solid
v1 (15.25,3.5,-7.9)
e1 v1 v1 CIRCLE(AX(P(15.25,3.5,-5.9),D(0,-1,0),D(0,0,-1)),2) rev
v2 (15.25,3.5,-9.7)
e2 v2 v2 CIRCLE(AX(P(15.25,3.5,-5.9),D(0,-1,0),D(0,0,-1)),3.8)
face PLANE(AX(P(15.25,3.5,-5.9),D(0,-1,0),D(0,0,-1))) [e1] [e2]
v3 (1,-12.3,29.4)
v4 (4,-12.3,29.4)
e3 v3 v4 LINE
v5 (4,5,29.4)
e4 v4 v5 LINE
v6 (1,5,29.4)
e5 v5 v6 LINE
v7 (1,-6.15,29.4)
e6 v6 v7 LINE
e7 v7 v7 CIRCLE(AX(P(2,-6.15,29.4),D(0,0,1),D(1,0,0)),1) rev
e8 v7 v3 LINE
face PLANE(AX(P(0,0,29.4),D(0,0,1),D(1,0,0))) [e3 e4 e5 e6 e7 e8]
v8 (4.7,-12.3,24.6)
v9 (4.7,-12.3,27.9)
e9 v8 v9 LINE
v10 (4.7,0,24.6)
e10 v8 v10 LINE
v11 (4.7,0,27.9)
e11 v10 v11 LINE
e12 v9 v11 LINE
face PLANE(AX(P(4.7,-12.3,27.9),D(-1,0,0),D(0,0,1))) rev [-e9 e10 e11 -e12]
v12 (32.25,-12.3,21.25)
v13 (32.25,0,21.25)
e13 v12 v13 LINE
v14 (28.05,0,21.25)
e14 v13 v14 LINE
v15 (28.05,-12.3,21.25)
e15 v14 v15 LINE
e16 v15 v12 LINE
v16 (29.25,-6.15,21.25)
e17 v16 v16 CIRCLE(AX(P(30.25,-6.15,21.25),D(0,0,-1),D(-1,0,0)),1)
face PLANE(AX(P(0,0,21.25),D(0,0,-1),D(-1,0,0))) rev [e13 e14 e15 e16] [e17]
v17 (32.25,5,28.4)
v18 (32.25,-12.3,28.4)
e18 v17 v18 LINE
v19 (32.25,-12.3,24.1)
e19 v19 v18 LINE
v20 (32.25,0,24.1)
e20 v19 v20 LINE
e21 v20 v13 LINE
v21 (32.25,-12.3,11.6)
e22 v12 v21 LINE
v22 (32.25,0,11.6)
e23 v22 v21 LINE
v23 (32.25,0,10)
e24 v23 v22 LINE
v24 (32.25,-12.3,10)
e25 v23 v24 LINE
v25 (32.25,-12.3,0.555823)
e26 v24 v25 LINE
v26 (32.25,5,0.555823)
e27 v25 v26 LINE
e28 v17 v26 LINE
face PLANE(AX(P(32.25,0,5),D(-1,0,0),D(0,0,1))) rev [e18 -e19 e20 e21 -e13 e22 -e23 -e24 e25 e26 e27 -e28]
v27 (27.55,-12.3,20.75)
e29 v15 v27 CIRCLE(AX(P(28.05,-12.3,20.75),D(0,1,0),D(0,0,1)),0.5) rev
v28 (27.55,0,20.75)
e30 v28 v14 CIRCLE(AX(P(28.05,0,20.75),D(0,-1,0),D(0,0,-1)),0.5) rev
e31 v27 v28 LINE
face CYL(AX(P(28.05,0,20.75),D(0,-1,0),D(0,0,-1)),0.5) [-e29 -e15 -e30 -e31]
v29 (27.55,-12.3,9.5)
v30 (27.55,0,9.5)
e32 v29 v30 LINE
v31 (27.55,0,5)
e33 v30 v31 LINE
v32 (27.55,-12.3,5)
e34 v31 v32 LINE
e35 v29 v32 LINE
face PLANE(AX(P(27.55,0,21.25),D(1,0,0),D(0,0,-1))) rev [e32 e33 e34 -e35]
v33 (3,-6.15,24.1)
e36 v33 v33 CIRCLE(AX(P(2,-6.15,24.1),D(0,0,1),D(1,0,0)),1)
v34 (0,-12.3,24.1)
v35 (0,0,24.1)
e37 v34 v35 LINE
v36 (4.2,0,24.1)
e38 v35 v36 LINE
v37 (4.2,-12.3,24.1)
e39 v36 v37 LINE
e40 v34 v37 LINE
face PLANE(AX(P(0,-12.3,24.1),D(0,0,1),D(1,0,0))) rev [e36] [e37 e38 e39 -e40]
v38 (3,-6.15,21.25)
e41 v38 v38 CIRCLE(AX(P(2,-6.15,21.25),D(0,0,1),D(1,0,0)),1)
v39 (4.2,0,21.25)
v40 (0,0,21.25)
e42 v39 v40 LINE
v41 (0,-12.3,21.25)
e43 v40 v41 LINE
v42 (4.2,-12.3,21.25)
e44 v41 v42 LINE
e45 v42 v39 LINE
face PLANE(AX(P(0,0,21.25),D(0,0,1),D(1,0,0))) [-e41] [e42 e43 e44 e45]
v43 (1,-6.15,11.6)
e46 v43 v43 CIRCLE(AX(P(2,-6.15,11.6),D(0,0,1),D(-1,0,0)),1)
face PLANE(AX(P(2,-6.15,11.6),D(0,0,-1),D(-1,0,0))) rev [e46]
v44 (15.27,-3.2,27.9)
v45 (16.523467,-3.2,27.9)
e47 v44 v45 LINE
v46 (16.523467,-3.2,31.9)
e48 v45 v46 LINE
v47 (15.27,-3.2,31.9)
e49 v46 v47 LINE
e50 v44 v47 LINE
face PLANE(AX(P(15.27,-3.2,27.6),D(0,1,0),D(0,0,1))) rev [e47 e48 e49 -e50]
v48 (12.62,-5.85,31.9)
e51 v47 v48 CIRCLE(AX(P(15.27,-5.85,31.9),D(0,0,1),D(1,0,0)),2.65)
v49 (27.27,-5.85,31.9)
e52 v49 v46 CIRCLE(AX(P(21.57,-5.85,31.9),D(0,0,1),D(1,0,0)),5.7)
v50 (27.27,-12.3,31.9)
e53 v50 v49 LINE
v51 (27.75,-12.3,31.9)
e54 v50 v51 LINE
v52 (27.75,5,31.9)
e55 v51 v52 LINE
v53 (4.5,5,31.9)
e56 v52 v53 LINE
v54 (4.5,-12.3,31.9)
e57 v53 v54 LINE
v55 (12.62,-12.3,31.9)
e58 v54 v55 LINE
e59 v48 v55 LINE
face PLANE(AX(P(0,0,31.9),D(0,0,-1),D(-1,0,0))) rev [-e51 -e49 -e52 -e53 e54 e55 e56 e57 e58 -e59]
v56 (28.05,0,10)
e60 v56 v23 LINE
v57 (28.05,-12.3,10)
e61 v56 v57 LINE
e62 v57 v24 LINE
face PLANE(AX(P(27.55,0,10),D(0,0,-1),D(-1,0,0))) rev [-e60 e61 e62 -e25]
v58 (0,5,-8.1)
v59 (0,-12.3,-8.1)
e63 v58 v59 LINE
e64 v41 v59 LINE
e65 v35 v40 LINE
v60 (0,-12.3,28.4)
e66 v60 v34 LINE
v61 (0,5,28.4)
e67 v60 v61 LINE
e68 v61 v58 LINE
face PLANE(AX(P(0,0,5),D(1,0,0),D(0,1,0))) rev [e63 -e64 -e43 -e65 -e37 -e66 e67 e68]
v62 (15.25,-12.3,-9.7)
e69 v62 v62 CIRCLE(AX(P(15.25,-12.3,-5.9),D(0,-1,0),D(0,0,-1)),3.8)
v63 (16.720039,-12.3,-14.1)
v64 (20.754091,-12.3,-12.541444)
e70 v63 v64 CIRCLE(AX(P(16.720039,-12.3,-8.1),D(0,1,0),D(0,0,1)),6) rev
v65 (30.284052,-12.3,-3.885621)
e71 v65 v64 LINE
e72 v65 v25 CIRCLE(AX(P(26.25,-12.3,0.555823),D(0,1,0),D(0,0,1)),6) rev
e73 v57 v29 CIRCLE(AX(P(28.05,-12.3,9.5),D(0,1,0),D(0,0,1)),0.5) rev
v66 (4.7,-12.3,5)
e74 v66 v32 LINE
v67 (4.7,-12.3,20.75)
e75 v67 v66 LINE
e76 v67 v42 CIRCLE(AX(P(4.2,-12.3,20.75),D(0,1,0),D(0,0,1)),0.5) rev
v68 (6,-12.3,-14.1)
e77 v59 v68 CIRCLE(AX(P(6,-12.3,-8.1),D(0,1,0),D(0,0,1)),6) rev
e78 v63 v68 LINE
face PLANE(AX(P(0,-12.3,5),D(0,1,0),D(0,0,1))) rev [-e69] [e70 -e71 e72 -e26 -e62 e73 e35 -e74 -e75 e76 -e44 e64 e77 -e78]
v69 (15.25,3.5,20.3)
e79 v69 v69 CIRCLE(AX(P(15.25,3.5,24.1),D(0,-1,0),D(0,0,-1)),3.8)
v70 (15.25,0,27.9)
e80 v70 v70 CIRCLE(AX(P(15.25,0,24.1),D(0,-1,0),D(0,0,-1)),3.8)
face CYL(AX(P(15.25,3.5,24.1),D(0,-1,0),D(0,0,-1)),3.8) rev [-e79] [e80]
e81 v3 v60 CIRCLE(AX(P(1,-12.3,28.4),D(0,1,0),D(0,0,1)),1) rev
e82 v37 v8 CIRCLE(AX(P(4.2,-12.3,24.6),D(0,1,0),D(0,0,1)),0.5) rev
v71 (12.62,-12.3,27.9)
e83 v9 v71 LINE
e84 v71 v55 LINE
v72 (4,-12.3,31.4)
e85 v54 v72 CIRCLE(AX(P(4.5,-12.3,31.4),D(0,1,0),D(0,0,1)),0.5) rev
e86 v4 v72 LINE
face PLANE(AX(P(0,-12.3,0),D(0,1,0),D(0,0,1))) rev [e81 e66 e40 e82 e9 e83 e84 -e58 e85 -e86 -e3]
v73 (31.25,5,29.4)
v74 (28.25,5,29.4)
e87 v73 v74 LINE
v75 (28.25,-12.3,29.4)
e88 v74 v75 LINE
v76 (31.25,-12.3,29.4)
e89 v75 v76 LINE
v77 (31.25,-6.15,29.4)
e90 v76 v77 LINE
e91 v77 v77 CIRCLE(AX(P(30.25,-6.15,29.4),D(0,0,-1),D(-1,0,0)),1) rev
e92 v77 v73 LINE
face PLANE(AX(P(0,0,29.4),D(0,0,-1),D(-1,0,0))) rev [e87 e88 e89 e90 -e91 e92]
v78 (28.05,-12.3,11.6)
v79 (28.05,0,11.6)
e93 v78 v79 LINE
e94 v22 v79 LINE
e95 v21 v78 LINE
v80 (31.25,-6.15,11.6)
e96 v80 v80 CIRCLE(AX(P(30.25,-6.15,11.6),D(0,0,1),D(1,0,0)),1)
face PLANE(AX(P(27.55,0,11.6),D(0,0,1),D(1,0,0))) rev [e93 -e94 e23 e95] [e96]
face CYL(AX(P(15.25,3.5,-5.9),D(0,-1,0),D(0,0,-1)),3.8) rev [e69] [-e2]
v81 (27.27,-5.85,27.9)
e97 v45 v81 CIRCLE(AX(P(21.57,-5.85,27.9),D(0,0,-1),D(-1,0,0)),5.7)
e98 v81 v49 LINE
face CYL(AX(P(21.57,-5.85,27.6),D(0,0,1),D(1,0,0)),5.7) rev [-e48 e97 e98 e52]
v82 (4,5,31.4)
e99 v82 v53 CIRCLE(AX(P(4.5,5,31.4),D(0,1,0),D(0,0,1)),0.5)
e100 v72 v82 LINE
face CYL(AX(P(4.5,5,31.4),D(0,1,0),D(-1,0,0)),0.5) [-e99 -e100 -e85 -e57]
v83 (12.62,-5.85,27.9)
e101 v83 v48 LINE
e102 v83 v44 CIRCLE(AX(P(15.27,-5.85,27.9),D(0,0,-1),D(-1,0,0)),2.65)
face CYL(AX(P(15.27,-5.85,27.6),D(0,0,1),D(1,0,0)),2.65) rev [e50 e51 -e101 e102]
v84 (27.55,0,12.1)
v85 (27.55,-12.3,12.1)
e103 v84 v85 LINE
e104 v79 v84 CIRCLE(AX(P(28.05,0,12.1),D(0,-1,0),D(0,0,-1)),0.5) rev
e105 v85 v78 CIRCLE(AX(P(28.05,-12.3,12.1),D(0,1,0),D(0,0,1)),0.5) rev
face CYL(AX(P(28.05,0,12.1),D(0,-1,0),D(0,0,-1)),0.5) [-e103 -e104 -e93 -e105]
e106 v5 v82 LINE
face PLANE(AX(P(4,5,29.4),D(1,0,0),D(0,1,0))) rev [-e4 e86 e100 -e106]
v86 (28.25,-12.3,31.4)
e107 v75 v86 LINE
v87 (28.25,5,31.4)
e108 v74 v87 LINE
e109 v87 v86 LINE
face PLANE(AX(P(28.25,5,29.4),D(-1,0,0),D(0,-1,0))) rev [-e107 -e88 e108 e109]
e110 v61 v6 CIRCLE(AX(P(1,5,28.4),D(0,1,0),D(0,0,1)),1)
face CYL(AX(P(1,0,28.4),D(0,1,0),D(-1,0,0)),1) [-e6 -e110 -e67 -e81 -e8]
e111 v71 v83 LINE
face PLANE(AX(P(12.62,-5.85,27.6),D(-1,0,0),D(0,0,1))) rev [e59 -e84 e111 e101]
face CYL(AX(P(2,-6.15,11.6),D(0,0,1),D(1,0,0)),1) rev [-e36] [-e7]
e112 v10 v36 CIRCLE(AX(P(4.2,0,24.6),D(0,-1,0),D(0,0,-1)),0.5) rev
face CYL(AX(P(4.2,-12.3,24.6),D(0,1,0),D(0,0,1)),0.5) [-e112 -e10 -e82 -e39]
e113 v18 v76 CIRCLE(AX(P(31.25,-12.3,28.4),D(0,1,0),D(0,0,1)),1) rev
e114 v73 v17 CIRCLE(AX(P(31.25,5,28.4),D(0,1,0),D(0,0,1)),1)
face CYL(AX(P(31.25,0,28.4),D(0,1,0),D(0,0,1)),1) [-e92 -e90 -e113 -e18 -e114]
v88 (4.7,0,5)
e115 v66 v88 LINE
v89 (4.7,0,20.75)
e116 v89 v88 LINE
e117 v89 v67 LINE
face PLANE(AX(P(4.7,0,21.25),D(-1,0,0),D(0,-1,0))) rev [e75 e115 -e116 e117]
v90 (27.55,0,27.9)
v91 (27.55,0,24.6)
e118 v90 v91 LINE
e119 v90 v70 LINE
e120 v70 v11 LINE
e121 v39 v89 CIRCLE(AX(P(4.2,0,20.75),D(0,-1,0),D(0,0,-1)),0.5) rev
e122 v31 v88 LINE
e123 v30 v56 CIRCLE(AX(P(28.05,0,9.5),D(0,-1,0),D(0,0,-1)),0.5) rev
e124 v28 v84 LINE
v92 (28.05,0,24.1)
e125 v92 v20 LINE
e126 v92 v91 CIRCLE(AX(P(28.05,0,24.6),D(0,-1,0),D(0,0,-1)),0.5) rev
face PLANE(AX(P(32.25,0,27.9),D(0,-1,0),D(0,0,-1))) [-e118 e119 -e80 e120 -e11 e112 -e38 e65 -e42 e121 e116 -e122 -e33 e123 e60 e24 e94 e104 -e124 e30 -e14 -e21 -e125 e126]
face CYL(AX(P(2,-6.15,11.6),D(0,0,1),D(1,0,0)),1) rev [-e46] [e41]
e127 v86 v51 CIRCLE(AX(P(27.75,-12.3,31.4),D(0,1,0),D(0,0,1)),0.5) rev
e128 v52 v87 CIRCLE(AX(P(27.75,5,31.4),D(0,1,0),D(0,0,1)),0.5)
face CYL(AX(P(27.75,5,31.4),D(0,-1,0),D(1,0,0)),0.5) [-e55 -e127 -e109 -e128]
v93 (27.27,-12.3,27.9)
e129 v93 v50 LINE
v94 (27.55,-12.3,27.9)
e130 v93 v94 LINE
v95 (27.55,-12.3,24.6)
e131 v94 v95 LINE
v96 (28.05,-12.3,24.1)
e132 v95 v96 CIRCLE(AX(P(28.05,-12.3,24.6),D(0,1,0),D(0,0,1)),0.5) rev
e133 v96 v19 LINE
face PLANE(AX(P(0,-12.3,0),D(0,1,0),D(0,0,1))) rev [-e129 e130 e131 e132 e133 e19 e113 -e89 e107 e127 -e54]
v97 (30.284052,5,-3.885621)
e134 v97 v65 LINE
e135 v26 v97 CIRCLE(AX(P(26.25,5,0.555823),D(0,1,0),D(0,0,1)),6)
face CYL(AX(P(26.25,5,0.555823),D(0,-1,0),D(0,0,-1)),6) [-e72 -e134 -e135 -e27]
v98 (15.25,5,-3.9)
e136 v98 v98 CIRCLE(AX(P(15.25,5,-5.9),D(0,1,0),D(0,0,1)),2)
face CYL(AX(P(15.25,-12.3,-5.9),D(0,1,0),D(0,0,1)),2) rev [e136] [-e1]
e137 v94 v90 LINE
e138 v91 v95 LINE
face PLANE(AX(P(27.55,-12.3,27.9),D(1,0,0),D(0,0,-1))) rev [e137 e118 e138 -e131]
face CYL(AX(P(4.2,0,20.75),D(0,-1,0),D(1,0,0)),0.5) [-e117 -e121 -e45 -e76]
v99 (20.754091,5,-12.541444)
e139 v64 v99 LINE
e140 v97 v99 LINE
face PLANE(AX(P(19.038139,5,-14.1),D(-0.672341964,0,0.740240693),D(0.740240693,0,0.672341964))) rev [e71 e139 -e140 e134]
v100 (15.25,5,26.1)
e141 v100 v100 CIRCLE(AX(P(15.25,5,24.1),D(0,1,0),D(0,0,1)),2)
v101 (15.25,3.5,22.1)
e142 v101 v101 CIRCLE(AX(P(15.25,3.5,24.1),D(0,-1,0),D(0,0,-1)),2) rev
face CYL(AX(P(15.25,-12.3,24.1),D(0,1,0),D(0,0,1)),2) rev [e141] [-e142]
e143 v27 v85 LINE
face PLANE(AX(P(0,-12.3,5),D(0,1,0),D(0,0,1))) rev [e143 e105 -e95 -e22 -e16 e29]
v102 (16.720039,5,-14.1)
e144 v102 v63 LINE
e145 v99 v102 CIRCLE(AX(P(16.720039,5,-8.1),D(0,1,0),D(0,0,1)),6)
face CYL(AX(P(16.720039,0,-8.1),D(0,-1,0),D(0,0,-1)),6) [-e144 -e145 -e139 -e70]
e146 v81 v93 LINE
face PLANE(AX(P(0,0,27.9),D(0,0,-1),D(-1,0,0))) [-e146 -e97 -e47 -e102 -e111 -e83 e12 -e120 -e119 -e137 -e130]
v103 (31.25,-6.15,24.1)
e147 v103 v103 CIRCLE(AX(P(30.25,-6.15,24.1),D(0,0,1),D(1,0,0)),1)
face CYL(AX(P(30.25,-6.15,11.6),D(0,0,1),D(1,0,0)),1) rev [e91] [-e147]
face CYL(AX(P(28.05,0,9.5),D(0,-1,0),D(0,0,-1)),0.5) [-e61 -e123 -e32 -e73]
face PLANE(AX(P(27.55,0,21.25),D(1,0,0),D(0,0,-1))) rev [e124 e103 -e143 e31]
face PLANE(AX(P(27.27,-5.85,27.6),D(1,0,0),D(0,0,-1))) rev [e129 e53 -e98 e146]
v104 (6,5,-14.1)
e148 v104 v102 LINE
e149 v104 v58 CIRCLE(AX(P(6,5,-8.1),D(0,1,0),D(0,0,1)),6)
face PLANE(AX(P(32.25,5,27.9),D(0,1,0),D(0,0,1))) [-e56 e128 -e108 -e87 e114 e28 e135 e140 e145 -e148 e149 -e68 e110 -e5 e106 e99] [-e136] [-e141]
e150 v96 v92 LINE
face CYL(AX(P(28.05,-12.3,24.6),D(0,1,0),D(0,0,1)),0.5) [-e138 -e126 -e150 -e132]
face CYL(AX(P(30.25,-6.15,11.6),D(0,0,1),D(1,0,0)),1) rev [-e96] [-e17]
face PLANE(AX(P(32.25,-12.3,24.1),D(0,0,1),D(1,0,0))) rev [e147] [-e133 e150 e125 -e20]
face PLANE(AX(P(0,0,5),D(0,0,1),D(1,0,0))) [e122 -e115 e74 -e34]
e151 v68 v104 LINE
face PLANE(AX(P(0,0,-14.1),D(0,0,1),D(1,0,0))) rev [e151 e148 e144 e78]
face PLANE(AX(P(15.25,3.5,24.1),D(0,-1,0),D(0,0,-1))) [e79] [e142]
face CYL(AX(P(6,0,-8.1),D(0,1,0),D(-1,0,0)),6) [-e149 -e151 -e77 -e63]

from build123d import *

# Parameters (mm, degrees)
ESQUISSE1_W              = 32.25
ESQUISSE1_H              = 12.3
BOSS_EXTRU_1_DEPTH       = 5
ESQUISSE2_W              = 4.7
ESQUISSE2_H              = 12.3
BOSS_EXTRU_2_DEPTH       = 16.25
ESQUISSE5_W              = 32.25
ESQUISSE5_H              = 5
BOSS_EXTRU_4_DEPTH       = 27.9
ESQUISSE6_W              = 4.7
ESQUISSE6_H              = 3.8
BOSS_EXTRU_5_DEPTH       = 12.3
ESQUISSE7_W              = 32.25
ESQUISSE7_H              = 17.3
BOSS_EXTRU_6_DEPTH       = 4
ENL_V_MAT_EXTRU_2_DEPTH  = 4.3
ENL_V_START              = -12.3
ESQUISSE9_W              = 4.7
ESQUISSE9_H              = 1.6
ENL_V_MAT_EXTRU_3_DEPTH  = 12.3
ESQUISSE10_R             = 1
ENL_V_MAT_EXTRU_4_DEPTH  = 20.3
ESQUISSE16_W             = 32.25
ESQUISSE16_H             = 17.3
BOSS_EXTRU_8_DEPTH       = 14.1
ENL_V_START_2            = -17.3
ESQUISSE18_R             = 2
ENL_V_MAT_EXTRU_8_DEPTH  = 17.3
CONG_4_R                 = 6
ESQUISSE19_R             = 3.8
ENL_V_MAT_EXTRU_9_DEPTH  = 15.8
ESQUISSE20_W             = 4
ESQUISSE20_H             = 17.3
ENL_V_MAT_EXTRU_10_DEPTH = 2.5
ENL_V_MAT_EXTRU_11_DEPTH = 17.3
CONG_5_R                 = 6
CONG_6_R                 = 6
CONG_7_R                 = 1
CONG_8_R                 = 1
CONG_9_R                 = 0.5
CONG_10_R                = 0.5
CONG_11_R                = 0.5


with BuildPart() as part:
    # Esquisse1 → Boss.-Extru.1 (new body)
    with BuildSketch(Plane.XY):
        with Locations((16.125, -6.15)):
            Rectangle(ESQUISSE1_W, ESQUISSE1_H)
    extrude(amount=BOSS_EXTRU_1_DEPTH)

    # Esquisse2 → Boss.-Extru.2 (add)
    with BuildSketch(Plane.XY.offset(5)):
        with Locations((2.35, -6.15)):
            Rectangle(ESQUISSE2_W, ESQUISSE2_H)
        with Locations((29.9, -6.15)):
            Rectangle(ESQUISSE2_W, ESQUISSE2_H)
    extrude(amount=BOSS_EXTRU_2_DEPTH)

    # Esquisse5 → Boss.-Extru.4 (add)
    with BuildSketch(Plane(origin=(0, 0, 0), x_dir=(-1, 0, 0), z_dir=(0, 0, -1))):
        with Locations((-16.125, 2.5)):
            Rectangle(ESQUISSE5_W, ESQUISSE5_H)
    extrude(amount=-BOSS_EXTRU_4_DEPTH)

    # Esquisse6 → Boss.-Extru.5 (add)
    with BuildSketch(Plane.XZ):
        with Locations((29.9, 26)):
            Rectangle(ESQUISSE6_W, ESQUISSE6_H)
        with Locations((2.35, 26)):
            Rectangle(ESQUISSE6_W, ESQUISSE6_H)
    extrude(amount=BOSS_EXTRU_5_DEPTH)

    # Esquisse7 → Boss.-Extru.6 (add)
    with BuildSketch(Plane.XY.offset(27.9)):
        with Locations((16.125, -3.65)):
            Rectangle(ESQUISSE7_W, ESQUISSE7_H)
    extrude(amount=BOSS_EXTRU_6_DEPTH)

    # Esquisse8 → Enlèv. mat.-Extru.2 (cut)
    with BuildSketch(Plane.XY.offset(31.9)):
        with BuildLine():
            Line((12.62, -5.85), (12.62, -12.3))
            Line((12.62, -12.3), (27.27, -12.3))
            Line((27.27, -12.3), (27.27, -5.85))
            ThreePointArc((27.27, -5.85), (22.934690305, -0.315777347), (16.523466536, -3.2))
            Line((16.523466536, -3.2), (15.27, -3.2))
            ThreePointArc((15.27, -3.2), (13.39616703, -3.97616703), (12.62, -5.85))
        make_face()
    extrude(amount=-ENL_V_MAT_EXTRU_2_DEPTH, mode=Mode.SUBTRACT)

    # Esquisse9 → Enlèv. mat.-Extru.3 (cut)
    with BuildSketch(Plane.XZ.offset(12.3).offset(ENL_V_START)):
        with Locations((29.9, 10.8)):
            Rectangle(ESQUISSE9_W, ESQUISSE9_H)
    extrude(amount=ENL_V_MAT_EXTRU_3_DEPTH, mode=Mode.SUBTRACT)

    # Esquisse10 → Enlèv. mat.-Extru.4 (cut)
    with BuildSketch(Plane.XY.offset(31.9)):
        with Locations((30.25, -6.15)):
            Circle(ESQUISSE10_R)
        with Locations((2, -6.15)):
            Circle(ESQUISSE10_R)
    extrude(amount=-ENL_V_MAT_EXTRU_4_DEPTH, mode=Mode.SUBTRACT)

    # Esquisse16 → Boss.-Extru.8 (add)
    with BuildSketch(Plane(origin=(0, 0, 0), x_dir=(-1, 0, 0), z_dir=(0, 0, -1))):
        with Locations((-16.125, -3.65)):
            Rectangle(ESQUISSE16_W, ESQUISSE16_H)
    extrude(amount=BOSS_EXTRU_8_DEPTH)

    # Esquisse18 → Enlèv. mat.-Extru.8 (cut)
    with BuildSketch(Plane(origin=(0, 5, 0), x_dir=(1, 0, 0), z_dir=(0, 1, 0)).offset(ENL_V_START_2)):
        with Locations(Location((15.25, -24.1, 0), (0, 0, 270))):
            Circle(ESQUISSE18_R)
        with Locations(Location((15.25, 5.9, 0), (0, 0, 270))):
            Circle(ESQUISSE18_R)
    extrude(amount=ENL_V_MAT_EXTRU_8_DEPTH, mode=Mode.SUBTRACT)

    # Congé4
    cong_4_edges = [part.edges().sort_by_distance(p)[0] for p in [
        (0, -3.65, -14.1),
    ]]
    fillet(cong_4_edges, radius=CONG_4_R)

    # Esquisse19 → Enlèv. mat.-Extru.9 (cut)
    with BuildSketch(Plane.XZ.offset(12.3)):
        with Locations(Location((15.25, -5.9, 0), (0, 0, 270))):
            Circle(ESQUISSE19_R)
        with Locations(Location((15.25, 24.1, 0), (0, 0, 270))):
            Circle(ESQUISSE19_R)
    extrude(amount=-ENL_V_MAT_EXTRU_9_DEPTH, mode=Mode.SUBTRACT)

    # Esquisse20 → Enlèv. mat.-Extru.10 (cut)
    with BuildSketch(Plane.XY.offset(31.9)):
        with Locations((2, -3.65)):
            Rectangle(ESQUISSE20_W, ESQUISSE20_H)
        with Locations((30.25, -3.65)):
            Rectangle(ESQUISSE20_W, ESQUISSE20_H)
    extrude(amount=-ENL_V_MAT_EXTRU_10_DEPTH, mode=Mode.SUBTRACT)

    # Esquisse22 → Enlèv. mat.-Extru.11 (cut)
    with BuildSketch(Plane.XZ.offset(12.3).offset(ENL_V_START_2)):
        Polygon((19.038139385, -14.1), (32.25, -2.1), (32.25, -14.1), align=None)
    extrude(amount=ENL_V_MAT_EXTRU_11_DEPTH, mode=Mode.SUBTRACT)

    # Congé5
    cong_5_edges = [part.edges().sort_by_distance(p)[0] for p in [
        (19.038139385, -3.65, -14.1),
    ]]
    fillet(cong_5_edges, radius=CONG_5_R)

    # Congé6
    cong_6_edges = [part.edges().sort_by_distance(p)[0] for p in [
        (32.25, -3.65, -2.1),
    ]]
    fillet(cong_6_edges, radius=CONG_6_R)

    # Congé7
    cong_7_edges = [part.edges().sort_by_distance(p)[0] for p in [
        (32.25, -3.65, 29.4),
    ]]
    fillet(cong_7_edges, radius=CONG_7_R - 0.0001)  # a hair under: the kernel refuses the full size

    # Congé8
    cong_8_edges = [part.edges().sort_by_distance(p)[0] for p in [
        (0, -3.65, 29.4),
    ]]
    fillet(cong_8_edges, radius=CONG_8_R - 0.0001)  # a hair under: the kernel refuses the full size

    # Congé9
    cong_9_edges = [part.edges().sort_by_distance(p)[0] for p in [
        (28.25, -3.65, 31.9),
    ]]
    fillet(cong_9_edges, radius=CONG_9_R)

    # Congé10
    cong_10_edges = [part.edges().sort_by_distance(p)[0] for p in [
        (4, -3.65, 31.9),
    ]]
    fillet(cong_10_edges, radius=CONG_10_R)

    # Congé11
    cong_11_edges = [part.edges().sort_by_distance(p)[0] for p in [
        (27.55, -6.15, 10),
        (27.55, -6.15, 11.6),
        (4.7, -6.15, 21.25),
        (27.55, -6.15, 21.25),
        (27.55, -6.15, 24.1),
        (4.7, -6.15, 24.1),
    ]]
    fillet(cong_11_edges, radius=CONG_11_R)


solid = part.part
